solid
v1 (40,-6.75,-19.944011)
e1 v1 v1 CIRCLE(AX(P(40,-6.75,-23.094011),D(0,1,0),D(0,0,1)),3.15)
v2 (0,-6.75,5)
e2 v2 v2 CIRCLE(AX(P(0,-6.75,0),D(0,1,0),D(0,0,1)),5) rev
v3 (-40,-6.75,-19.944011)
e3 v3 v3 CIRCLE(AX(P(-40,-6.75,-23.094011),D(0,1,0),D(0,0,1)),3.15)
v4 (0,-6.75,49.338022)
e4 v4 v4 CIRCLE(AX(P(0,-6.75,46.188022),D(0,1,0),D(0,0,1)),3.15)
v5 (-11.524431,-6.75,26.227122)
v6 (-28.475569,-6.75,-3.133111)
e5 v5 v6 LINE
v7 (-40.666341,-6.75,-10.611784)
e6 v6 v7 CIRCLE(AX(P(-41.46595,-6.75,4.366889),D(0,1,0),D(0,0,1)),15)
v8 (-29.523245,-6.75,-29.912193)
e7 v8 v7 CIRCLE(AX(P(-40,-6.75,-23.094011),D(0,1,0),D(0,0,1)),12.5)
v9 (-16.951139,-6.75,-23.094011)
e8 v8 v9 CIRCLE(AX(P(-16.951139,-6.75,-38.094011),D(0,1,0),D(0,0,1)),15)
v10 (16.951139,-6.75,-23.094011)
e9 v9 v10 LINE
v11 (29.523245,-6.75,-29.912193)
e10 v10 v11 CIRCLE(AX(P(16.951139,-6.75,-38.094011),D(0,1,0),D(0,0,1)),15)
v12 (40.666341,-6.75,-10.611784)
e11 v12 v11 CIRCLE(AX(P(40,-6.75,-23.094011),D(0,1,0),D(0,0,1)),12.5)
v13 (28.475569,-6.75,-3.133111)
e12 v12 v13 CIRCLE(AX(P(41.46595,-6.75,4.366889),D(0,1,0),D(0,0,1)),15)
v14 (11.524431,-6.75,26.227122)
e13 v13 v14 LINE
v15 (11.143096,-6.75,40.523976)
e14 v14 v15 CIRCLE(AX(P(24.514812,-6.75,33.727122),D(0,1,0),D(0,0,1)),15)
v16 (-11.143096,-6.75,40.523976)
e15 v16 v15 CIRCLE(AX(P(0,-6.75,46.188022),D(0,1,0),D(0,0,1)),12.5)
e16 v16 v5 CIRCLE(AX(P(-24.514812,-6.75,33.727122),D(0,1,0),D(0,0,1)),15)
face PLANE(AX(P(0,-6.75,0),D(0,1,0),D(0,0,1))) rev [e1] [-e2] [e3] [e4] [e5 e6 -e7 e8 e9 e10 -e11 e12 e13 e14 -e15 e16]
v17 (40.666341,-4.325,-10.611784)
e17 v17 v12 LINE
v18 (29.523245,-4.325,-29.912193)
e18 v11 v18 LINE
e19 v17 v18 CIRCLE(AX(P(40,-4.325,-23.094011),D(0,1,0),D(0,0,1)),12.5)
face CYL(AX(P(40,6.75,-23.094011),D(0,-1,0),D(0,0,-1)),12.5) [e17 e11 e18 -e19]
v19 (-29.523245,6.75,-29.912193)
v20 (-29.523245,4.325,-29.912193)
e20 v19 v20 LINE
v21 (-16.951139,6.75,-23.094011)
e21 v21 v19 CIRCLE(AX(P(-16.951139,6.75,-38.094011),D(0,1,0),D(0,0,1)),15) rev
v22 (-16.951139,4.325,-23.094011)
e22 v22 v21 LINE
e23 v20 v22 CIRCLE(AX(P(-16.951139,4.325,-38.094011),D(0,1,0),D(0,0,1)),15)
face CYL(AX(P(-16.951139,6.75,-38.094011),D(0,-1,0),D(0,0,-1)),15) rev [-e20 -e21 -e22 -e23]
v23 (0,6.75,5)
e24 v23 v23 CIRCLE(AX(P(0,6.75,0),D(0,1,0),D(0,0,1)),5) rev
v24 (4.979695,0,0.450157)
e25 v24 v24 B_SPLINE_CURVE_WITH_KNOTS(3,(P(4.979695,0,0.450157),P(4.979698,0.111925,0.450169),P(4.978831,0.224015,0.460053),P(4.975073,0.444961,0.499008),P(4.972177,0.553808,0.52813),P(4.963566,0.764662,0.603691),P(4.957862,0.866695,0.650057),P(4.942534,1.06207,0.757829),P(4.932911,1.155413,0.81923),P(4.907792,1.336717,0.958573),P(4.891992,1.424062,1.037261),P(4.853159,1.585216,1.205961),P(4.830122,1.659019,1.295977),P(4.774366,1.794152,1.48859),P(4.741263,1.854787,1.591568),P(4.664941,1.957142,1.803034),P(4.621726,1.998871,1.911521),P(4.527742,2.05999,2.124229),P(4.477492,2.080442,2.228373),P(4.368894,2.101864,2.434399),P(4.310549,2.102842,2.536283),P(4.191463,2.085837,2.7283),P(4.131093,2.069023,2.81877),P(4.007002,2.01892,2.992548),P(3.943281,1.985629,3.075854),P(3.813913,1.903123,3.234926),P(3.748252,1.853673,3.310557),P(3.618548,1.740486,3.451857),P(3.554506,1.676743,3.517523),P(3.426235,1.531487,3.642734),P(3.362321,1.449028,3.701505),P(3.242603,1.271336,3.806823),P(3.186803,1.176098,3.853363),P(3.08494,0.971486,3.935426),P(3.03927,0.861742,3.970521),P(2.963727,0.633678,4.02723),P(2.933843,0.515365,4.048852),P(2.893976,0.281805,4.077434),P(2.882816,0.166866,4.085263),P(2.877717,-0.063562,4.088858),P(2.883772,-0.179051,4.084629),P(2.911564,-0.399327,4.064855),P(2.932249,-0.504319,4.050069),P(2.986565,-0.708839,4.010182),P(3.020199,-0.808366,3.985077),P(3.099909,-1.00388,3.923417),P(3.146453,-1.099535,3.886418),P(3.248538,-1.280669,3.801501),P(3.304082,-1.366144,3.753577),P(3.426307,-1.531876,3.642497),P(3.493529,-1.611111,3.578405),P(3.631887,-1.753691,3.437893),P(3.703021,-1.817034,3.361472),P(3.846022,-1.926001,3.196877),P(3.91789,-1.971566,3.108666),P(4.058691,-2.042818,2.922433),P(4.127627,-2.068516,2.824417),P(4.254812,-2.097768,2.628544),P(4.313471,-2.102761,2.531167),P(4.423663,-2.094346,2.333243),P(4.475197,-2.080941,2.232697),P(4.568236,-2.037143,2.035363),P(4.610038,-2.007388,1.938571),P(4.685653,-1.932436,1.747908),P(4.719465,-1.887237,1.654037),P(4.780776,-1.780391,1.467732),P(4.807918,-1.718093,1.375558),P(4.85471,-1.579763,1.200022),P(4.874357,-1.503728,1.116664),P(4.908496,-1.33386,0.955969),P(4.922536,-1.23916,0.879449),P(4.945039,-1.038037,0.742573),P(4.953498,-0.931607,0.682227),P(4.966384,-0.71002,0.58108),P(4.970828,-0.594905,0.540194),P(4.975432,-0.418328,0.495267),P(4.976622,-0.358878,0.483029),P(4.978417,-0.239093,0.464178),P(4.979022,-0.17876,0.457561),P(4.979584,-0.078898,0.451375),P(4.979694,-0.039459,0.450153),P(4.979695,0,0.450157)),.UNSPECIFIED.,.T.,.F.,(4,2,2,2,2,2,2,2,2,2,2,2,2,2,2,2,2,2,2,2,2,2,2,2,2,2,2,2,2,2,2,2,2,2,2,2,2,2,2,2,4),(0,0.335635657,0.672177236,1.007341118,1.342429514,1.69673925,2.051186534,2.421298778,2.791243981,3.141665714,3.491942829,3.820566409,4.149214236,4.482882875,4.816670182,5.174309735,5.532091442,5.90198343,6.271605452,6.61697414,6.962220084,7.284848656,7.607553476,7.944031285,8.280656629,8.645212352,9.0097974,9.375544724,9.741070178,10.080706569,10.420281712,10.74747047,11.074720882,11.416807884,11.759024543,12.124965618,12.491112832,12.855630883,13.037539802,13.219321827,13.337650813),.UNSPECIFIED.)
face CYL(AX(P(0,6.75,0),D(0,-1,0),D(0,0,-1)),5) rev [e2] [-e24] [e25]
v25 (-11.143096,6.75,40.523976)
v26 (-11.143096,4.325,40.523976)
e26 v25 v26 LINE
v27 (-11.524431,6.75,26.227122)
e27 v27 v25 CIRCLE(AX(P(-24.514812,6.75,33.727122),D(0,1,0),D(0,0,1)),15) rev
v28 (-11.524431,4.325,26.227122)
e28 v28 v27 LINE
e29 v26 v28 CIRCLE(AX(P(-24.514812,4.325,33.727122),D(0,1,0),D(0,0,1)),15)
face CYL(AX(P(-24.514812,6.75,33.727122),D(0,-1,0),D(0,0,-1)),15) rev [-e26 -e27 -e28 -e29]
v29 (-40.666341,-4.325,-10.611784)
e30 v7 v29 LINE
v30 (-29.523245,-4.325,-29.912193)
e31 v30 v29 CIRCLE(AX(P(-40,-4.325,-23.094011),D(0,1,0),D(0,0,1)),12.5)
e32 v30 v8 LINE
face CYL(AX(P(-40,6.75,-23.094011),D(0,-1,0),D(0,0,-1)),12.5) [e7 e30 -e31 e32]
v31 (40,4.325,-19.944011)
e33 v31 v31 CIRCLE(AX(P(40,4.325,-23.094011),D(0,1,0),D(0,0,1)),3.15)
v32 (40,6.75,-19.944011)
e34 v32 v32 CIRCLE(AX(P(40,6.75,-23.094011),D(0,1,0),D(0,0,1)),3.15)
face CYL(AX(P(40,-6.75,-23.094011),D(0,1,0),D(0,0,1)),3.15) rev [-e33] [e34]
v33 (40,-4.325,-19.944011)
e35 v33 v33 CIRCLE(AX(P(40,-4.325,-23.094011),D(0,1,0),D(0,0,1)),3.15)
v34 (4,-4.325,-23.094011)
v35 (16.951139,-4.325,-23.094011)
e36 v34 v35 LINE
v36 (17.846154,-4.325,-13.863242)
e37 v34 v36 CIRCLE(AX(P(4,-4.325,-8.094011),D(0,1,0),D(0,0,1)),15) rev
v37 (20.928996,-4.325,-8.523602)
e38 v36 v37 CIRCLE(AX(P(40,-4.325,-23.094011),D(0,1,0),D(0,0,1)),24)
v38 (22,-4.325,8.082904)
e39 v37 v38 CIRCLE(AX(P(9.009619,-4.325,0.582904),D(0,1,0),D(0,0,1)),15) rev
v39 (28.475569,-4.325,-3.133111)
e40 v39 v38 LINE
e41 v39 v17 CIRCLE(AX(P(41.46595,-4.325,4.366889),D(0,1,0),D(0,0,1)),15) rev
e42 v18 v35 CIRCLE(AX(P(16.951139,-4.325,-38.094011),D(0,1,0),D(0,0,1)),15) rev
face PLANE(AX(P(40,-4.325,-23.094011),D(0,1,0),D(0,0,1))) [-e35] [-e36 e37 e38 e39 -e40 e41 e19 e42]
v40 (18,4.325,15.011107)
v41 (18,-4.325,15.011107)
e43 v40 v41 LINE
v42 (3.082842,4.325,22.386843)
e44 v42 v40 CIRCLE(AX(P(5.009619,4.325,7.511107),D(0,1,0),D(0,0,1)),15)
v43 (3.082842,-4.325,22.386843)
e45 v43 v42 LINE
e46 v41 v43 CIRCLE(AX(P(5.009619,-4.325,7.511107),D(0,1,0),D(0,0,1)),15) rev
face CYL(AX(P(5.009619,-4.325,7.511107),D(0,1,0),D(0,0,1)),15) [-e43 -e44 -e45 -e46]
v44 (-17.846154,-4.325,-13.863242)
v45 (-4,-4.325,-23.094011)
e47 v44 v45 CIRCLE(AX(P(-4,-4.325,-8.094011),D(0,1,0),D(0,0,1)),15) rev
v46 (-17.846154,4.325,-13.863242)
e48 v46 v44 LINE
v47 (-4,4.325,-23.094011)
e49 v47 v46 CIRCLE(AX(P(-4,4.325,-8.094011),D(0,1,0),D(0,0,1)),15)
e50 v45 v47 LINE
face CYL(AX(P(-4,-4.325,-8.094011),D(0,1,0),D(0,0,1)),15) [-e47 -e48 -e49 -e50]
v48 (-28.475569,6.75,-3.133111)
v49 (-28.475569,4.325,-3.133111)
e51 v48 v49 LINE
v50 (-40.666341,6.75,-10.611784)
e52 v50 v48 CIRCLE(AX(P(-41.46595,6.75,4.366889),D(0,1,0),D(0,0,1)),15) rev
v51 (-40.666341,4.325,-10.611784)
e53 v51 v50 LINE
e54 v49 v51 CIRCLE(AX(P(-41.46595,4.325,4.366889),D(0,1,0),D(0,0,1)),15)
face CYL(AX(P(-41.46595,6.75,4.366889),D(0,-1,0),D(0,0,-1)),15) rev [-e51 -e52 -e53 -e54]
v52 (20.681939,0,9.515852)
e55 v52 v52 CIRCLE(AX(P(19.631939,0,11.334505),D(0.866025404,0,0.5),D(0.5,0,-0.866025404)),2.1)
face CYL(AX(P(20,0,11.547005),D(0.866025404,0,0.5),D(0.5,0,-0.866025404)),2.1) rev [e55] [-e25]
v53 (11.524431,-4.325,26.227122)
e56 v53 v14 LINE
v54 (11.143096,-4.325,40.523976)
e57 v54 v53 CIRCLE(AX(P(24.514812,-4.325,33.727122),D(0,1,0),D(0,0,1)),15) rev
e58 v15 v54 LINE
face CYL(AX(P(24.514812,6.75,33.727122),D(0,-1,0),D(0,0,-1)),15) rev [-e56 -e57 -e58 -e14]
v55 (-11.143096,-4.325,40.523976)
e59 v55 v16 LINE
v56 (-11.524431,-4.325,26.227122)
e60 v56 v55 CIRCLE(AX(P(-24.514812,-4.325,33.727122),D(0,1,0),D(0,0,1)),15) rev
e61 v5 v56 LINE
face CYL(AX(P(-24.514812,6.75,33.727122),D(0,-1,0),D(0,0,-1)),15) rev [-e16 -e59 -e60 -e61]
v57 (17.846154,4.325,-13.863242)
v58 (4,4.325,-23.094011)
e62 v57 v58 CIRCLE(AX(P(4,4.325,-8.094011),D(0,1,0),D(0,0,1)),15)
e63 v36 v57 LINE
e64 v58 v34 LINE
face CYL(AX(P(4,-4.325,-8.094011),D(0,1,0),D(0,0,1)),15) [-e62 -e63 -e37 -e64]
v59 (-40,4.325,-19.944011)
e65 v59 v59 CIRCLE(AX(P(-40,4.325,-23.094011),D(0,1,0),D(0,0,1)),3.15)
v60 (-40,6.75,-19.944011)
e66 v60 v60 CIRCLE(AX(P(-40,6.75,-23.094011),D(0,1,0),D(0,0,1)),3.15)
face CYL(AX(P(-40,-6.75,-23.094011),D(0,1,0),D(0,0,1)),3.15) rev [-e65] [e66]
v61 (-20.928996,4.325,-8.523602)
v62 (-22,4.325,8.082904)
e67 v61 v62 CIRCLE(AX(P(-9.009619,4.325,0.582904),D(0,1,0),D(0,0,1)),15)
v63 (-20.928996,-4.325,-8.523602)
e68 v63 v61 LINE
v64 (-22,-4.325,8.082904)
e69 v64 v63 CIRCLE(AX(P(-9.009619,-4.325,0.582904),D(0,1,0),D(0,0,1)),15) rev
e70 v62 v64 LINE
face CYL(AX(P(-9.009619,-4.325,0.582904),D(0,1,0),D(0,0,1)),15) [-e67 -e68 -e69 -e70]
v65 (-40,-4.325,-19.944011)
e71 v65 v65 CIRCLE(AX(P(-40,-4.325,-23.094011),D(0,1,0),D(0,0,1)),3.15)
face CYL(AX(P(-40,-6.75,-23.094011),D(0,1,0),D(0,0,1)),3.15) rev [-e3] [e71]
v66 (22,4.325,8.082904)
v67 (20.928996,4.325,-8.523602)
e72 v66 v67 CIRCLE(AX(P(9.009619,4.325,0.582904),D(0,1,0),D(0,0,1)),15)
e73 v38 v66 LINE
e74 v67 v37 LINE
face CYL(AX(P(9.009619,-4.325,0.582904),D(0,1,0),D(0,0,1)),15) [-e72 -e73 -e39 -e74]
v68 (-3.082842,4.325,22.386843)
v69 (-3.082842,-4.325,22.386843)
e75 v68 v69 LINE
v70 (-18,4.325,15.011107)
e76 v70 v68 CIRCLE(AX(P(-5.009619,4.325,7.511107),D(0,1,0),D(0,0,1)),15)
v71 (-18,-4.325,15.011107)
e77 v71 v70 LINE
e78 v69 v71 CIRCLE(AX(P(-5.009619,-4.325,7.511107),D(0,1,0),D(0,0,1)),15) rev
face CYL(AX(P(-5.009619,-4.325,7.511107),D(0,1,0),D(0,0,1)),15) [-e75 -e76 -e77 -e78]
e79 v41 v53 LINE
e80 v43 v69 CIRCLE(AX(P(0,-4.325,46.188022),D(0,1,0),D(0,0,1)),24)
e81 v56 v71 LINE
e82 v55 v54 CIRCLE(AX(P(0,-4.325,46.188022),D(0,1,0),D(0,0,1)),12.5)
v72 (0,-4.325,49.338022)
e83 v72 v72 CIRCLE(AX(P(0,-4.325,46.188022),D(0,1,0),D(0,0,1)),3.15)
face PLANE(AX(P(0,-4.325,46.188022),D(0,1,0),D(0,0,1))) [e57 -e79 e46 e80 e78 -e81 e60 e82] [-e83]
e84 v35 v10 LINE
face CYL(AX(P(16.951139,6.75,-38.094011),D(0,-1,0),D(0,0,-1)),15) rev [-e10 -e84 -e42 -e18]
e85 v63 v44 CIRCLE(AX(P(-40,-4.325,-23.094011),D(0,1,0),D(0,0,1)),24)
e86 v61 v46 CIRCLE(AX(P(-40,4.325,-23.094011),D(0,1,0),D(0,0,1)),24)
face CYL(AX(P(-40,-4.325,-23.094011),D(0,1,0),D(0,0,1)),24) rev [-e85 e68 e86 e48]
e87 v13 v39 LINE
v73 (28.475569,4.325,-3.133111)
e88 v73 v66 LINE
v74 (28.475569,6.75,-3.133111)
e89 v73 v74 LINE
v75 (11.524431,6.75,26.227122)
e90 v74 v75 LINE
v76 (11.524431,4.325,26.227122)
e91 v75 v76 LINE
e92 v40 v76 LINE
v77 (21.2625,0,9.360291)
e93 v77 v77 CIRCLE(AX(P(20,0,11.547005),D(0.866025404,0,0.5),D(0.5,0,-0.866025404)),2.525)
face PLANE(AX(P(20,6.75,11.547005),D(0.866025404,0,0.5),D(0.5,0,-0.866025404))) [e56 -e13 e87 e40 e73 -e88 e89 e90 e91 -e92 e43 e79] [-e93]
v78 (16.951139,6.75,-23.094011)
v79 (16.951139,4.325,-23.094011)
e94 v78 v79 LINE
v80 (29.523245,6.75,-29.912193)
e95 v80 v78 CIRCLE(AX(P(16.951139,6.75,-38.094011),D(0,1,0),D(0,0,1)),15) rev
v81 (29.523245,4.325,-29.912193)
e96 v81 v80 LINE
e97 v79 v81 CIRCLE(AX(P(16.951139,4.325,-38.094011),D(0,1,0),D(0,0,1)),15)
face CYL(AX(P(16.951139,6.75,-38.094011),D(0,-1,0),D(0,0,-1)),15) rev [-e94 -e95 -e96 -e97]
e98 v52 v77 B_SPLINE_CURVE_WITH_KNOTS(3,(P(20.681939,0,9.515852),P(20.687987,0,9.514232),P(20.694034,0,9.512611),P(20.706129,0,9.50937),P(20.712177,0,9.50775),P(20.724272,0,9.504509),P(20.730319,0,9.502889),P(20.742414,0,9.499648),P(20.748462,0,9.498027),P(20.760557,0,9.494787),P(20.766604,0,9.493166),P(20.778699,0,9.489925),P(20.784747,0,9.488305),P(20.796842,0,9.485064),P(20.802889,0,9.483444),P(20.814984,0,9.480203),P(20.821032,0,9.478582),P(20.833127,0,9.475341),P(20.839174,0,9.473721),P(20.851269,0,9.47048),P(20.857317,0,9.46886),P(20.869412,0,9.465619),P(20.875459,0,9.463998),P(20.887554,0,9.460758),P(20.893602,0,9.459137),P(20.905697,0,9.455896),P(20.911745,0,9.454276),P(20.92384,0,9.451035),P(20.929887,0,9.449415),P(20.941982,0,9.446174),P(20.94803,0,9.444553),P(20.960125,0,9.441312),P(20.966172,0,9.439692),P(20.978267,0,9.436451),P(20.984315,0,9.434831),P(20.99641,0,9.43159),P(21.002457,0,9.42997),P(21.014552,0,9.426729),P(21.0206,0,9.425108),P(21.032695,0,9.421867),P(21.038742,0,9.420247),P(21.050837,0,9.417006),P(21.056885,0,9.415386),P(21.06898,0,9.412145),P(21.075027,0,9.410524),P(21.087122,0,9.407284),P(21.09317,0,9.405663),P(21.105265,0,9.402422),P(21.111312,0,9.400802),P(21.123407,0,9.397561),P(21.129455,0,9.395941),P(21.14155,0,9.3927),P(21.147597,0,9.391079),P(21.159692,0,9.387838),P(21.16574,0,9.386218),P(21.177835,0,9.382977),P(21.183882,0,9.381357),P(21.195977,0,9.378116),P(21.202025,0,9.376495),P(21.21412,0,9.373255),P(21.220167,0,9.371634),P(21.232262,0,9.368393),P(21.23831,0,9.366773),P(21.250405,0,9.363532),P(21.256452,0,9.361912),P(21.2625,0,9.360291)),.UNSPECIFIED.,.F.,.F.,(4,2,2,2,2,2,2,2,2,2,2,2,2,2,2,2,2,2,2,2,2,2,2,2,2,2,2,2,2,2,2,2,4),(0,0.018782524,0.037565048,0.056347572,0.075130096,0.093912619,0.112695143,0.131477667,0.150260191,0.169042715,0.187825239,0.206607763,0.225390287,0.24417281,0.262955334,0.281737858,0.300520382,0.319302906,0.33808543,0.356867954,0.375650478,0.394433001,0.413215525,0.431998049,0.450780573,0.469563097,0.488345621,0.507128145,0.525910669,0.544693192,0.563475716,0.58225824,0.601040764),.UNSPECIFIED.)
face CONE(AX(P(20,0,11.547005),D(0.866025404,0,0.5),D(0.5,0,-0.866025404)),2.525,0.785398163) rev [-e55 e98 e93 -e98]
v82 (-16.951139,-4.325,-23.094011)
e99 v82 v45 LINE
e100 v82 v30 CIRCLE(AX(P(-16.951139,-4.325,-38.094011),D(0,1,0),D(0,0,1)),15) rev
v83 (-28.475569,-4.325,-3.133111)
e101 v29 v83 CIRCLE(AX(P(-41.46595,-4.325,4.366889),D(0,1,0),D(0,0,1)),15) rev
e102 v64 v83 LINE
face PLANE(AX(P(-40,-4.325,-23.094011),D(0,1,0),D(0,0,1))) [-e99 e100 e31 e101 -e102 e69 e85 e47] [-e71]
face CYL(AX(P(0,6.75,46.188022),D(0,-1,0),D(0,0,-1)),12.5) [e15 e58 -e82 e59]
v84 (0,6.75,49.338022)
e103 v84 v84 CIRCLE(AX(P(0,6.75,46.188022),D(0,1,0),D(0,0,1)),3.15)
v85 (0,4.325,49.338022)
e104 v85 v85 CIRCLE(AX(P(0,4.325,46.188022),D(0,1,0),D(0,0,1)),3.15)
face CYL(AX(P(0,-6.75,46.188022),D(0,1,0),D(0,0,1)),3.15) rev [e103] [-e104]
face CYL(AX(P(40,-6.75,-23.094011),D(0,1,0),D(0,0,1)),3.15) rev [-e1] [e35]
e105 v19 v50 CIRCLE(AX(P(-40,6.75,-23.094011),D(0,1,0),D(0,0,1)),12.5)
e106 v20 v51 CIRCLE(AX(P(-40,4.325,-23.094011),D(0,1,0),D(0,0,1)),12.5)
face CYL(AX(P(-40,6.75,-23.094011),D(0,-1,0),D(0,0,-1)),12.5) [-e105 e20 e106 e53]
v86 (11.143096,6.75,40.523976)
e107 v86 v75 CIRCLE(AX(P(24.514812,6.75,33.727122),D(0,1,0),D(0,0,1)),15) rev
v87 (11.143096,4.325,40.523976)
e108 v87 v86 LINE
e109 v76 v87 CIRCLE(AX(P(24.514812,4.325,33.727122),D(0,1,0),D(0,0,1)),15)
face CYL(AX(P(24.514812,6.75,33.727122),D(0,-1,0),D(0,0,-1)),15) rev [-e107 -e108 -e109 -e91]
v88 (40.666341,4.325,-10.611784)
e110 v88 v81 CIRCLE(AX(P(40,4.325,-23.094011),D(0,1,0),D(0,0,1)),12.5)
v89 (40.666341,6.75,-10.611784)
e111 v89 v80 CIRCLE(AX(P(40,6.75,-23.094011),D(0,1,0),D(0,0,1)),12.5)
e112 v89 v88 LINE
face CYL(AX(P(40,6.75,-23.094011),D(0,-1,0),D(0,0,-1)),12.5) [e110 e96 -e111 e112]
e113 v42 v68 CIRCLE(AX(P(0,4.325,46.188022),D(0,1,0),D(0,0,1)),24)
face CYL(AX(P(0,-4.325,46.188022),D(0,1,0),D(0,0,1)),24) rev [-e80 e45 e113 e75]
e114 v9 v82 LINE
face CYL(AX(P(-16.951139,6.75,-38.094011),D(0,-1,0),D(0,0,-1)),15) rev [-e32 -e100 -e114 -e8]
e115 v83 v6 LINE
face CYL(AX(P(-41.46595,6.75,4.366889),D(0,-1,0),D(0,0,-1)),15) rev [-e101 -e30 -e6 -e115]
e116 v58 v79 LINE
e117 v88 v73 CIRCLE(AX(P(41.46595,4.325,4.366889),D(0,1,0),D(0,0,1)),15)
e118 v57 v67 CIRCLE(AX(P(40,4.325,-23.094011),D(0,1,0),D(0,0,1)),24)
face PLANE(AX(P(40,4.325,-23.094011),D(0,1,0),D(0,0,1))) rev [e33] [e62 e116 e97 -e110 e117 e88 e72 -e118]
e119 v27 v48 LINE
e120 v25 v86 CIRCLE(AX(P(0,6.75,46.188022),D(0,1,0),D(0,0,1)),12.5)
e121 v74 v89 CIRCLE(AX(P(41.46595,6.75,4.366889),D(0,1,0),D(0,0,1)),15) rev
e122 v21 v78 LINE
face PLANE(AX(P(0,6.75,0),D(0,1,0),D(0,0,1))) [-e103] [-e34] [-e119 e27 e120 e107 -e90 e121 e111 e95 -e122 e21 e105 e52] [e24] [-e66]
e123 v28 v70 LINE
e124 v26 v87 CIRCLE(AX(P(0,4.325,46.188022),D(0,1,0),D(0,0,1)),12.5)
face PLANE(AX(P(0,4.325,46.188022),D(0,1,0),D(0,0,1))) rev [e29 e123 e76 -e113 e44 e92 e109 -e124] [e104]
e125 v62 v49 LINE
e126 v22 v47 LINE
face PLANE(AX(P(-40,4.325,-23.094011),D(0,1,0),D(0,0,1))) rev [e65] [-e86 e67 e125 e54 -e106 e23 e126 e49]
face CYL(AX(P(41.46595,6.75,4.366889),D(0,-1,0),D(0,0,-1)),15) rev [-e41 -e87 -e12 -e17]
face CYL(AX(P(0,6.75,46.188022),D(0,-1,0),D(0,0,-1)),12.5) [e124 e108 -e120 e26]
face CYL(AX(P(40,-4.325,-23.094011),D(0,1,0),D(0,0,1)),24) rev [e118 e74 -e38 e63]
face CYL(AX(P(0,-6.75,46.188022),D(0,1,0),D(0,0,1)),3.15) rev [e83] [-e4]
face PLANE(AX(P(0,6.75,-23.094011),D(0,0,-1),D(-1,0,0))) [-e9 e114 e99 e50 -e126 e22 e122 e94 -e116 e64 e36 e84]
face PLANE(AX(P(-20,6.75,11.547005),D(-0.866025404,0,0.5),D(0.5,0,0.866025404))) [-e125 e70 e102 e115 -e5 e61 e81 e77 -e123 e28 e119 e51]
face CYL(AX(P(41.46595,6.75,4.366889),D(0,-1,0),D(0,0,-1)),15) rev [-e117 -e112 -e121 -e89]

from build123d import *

# Parameters (mm, degrees)
ESQUISSE1_R             = 12.5
ESQUISSE1_R_2           = 5
BOSS_EXTRU_1_DEPTH      = 6.75
ESQUISSE7_R             = 24
ENL_V_MAT_EXTRU_1_DEPTH = 4.325
CONG_6_START            = -4.325
CONG_6_DEPTH            = 8.65
CONG_7_R                = 15
ESQUISSE25_R            = 3.15
ENL_V_MAT_EXTRU_2_DEPTH = 80.892326756


with BuildPart() as part:
    # Esquisse1 → Boss.-Extru.1 (new, symmetric)
    # profile 1 of 16: a face of its own
    with BuildSketch(Plane(origin=(0, 0, 0), x_dir=(1, 0, 0), z_dir=(0, 1, 0))):
        with Locations((-40, 23.094010768)):
            Circle(ESQUISSE1_R)
    # profile 2 of 16: a face of its own
    with BuildSketch(Plane(origin=(0, 0, 0), x_dir=(1, 0, 0), z_dir=(0, 1, 0))):
        with Locations((0, -46.188021535)):
            Circle(ESQUISSE1_R)
    # profile 3 of 16: a face of its own
    with BuildSketch(Plane(origin=(0, 0, 0), x_dir=(1, 0, 0), z_dir=(0, 1, 0))):
        with Locations((40, 23.094010768)):
            Circle(ESQUISSE1_R)
    # profile 4 of 16: a face of its own
    with BuildSketch(Plane(origin=(0, 0, 0), x_dir=(1, 0, 0), z_dir=(0, 1, 0))):
        Polygon((0, -46.188021535), (-40, 23.094010768), (40, 23.094010768), align=None)
        with Locations(Location((0, 0, 0), (0, 0, 270))):
            Circle(ESQUISSE1_R_2, mode=Mode.SUBTRACT)
    # profile 5 of 16: a face of its own
    with BuildSketch(Plane(origin=(0, 0, 0), x_dir=(1, 0, 0), z_dir=(0, 1, 0))):
        with BuildLine():
            ThreePointArc((-33.75, 12.26869322), (-29.174682453, 16.844010768), (-27.5, 23.094010768))
            Line((-27.5, 23.094010768), (-40, 23.094010768))
            Line((-40, 23.094010768), (-33.75, 12.26869322))
        make_face()
    # profile 6 of 16: a face of its own
    with BuildSketch(Plane(origin=(0, 0, 0), x_dir=(1, 0, 0), z_dir=(0, 1, 0))):
        with BuildLine():
            Line((-40, 23.094010768), (-27.5, 23.094010768))
            ThreePointArc((-27.5, 23.094010768), (-50.825317547, 29.344010768), (-33.75, 12.26869322))
            Line((-33.75, 12.26869322), (-40, 23.094010768))
        make_face()
    # profile 7 of 16: a face of its own
    with BuildSketch(Plane(origin=(0, 0, 0), x_dir=(1, 0, 0), z_dir=(0, 1, 0))):
        with BuildLine():
            Line((27.5, 23.094010768), (40, 23.094010768))
            Line((40, 23.094010768), (33.75, 12.26869322))
            ThreePointArc((33.75, 12.26869322), (46.25, 12.26869322), (52.5, 23.094010768))
            ThreePointArc((52.5, 23.094010768), (40, 35.594010768), (27.5, 23.094010768))
        make_face()
    # profile 8 of 16: a face of its own
    with BuildSketch(Plane(origin=(0, 0, 0), x_dir=(1, 0, 0), z_dir=(0, 1, 0))):
        with BuildLine():
            Line((33.75, 12.26869322), (40, 23.094010768))
            Line((40, 23.094010768), (27.5, 23.094010768))
            ThreePointArc((27.5, 23.094010768), (29.174682453, 16.844010768), (33.75, 12.26869322))
        make_face()
    # profile 9 of 16: a face of its own
    with BuildSketch(Plane(origin=(0, 0, 0), x_dir=(1, 0, 0), z_dir=(0, 1, 0))):
        with BuildLine():
            Line((27.5, 23.094010768), (40, 23.094010768))
            Line((40, 23.094010768), (33.75, 12.26869322))
            ThreePointArc((33.75, 12.26869322), (46.25, 12.26869322), (52.5, 23.094010768))
            ThreePointArc((52.5, 23.094010768), (40, 35.594010768), (27.5, 23.094010768))
        make_face()
    # profile 10 of 16: a face of its own
    with BuildSketch(Plane(origin=(0, 0, 0), x_dir=(1, 0, 0), z_dir=(0, 1, 0))):
        with BuildLine():
            Line((33.75, 12.26869322), (40, 23.094010768))
            Line((40, 23.094010768), (27.5, 23.094010768))
            ThreePointArc((27.5, 23.094010768), (29.174682453, 16.844010768), (33.75, 12.26869322))
        make_face()
    # profile 11 of 16: a face of its own
    with BuildSketch(Plane(origin=(0, 0, 0), x_dir=(1, 0, 0), z_dir=(0, 1, 0))):
        with BuildLine():
            ThreePointArc((-33.75, 12.26869322), (-29.174682453, 16.844010768), (-27.5, 23.094010768))
            Line((-27.5, 23.094010768), (-40, 23.094010768))
            Line((-40, 23.094010768), (-33.75, 12.26869322))
        make_face()
    # profile 12 of 16: a face of its own
    with BuildSketch(Plane(origin=(0, 0, 0), x_dir=(1, 0, 0), z_dir=(0, 1, 0))):
        with BuildLine():
            Line((-40, 23.094010768), (-27.5, 23.094010768))
            ThreePointArc((-27.5, 23.094010768), (-50.825317547, 29.344010768), (-33.75, 12.26869322))
            Line((-33.75, 12.26869322), (-40, 23.094010768))
        make_face()
    # profile 13 of 16: a face of its own
    with BuildSketch(Plane(origin=(0, 0, 0), x_dir=(1, 0, 0), z_dir=(0, 1, 0))):
        with BuildLine():
            ThreePointArc((12.5, -46.188021535), (10.825317547, -39.938021535), (6.25, -35.362703988))
            Line((6.25, -35.362703988), (0, -46.188021535))
            Line((0, -46.188021535), (-6.25, -35.362703988))
            ThreePointArc((-6.25, -35.362703988), (-6.25, -57.013339082), (12.5, -46.188021535))
        make_face()
    # profile 14 of 16: a face of its own
    with BuildSketch(Plane(origin=(0, 0, 0), x_dir=(1, 0, 0), z_dir=(0, 1, 0))):
        with BuildLine():
            Line((0, -46.188021535), (6.25, -35.362703988))
            ThreePointArc((6.25, -35.362703988), (0, -33.688021535), (-6.25, -35.362703988))
            Line((-6.25, -35.362703988), (0, -46.188021535))
        make_face()
    # profile 15 of 16: a face of its own
    with BuildSketch(Plane(origin=(0, 0, 0), x_dir=(1, 0, 0), z_dir=(0, 1, 0))):
        with BuildLine():
            ThreePointArc((12.5, -46.188021535), (10.825317547, -39.938021535), (6.25, -35.362703988))
            Line((6.25, -35.362703988), (0, -46.188021535))
            Line((0, -46.188021535), (-6.25, -35.362703988))
            ThreePointArc((-6.25, -35.362703988), (-6.25, -57.013339082), (12.5, -46.188021535))
        make_face()
    # profile 16 of 16: a face of its own
    with BuildSketch(Plane(origin=(0, 0, 0), x_dir=(1, 0, 0), z_dir=(0, 1, 0))):
        with BuildLine():
            Line((0, -46.188021535), (6.25, -35.362703988))
            ThreePointArc((6.25, -35.362703988), (0, -33.688021535), (-6.25, -35.362703988))
            Line((-6.25, -35.362703988), (0, -46.188021535))
        make_face()
    extrude(amount=BOSS_EXTRU_1_DEPTH, both=True)

    # Esquisse7 → Enlèv. mat.-Extru.1 (cut, symmetric)
    with BuildSketch(Plane(origin=(0, 0, 0), x_dir=(1, 0, 0), z_dir=(0, 1, 0))):
        with Locations((-40, 23.094010768)):
            Circle(ESQUISSE7_R)
        with Locations((0, -46.188021535)):
            Circle(ESQUISSE7_R)
        with Locations((40, 23.094010768)):
            Circle(ESQUISSE7_R)
    extrude(amount=ENL_V_MAT_EXTRU_1_DEPTH, both=True, mode=Mode.SUBTRACT)

    # Congé6: read off the stored shape, not the designer's step
    # Congé6 outline → Congé6 (cut)
    with BuildSketch(Plane(origin=(0, 0, 0), x_dir=(1, 0, 0), z_dir=(0, 1, 0)).offset(CONG_6_START)):
        with BuildLine():
            ThreePointArc((4, 23.094010768), (12.320502943, 20.574765183), (17.846153846, 13.863241537))
            ThreePointArc((17.846153846, 13.863241537), (16.466063783, 18.387223525), (16, 23.094010768))
            Line((16, 23.094010768), (4, 23.094010768))
        make_face()
        with BuildLine():
            ThreePointArc((28, 2.309401077), (24.156834569, 5.066417775), (20.928996273, 8.523601822))
            ThreePointArc((20.928996273, 8.523601822), (23.978520797, 0.382485945), (22, -8.082903769))
            Line((22, -8.082903769), (28, 2.309401077))
        make_face()
        with BuildLine():
            ThreePointArc((-17.846153846, 13.863241537), (-12.320502943, 20.574765183), (-4, 23.094010768))
            Line((-4, 23.094010768), (-16, 23.094010768))
            ThreePointArc((-16, 23.094010768), (-16.466063783, 18.387223525), (-17.846153846, 13.863241537))
        make_face()
        with BuildLine():
            Line((12, -25.403411844), (18, -15.011106999))
            ThreePointArc((18, -15.011106999), (11.658017854, -20.957251128), (3.082842427, -22.386843359))
            ThreePointArc((3.082842427, -22.386843359), (7.690770786, -23.453641299), (12, -25.403411844))
        make_face()
        with BuildLine():
            ThreePointArc((-22, -8.082903769), (-23.978520797, 0.382485945), (-20.928996273, 8.523601822))
            ThreePointArc((-20.928996273, 8.523601822), (-24.156834569, 5.066417775), (-28, 2.309401077))
            Line((-28, 2.309401077), (-22, -8.082903769))
        make_face()
        with BuildLine():
            ThreePointArc((-12, -25.403411844), (-7.690770786, -23.453641299), (-3.082842427, -22.386843359))
            ThreePointArc((-3.082842427, -22.386843359), (-11.658017854, -20.957251128), (-18, -15.011106999))
            Line((-18, -15.011106999), (-12, -25.403411844))
        make_face()
    extrude(amount=CONG_6_DEPTH, mode=Mode.SUBTRACT)

    # Trou taraudé M51: read off the stored shape, not the designer's step
    # Trou taraudé M51 outline → Trou taraudé M51 (revolve, cut)
    with BuildSketch(Plane(origin=(0, 0, 0), x_dir=(0.5000000000000003, 0, -0.8660254037844385), z_dir=(0, -1, 0))):
        Polygon((0, 4.537411543), (2.1, 4.537411543), (2.1, 22.669010768), (2.525, 23.094010768), (0, 23.094010768), align=None)
    revolve(axis=Axis((0, 0, 0), (0.8660254037844385, 0, 0.5000000000000003)), mode=Mode.SUBTRACT)

    # Congé7
    cong_7_edges = [part.edges().sort_by_distance(p)[0] for p in [
        (-27.5, 5.5375, -23.094010768),
        (27.5, 5.5375, -23.094010768),
        (33.75, 5.5375, -12.26869322),
        (6.25, 5.5375, 35.362703988),
        (-6.25, 5.5375, 35.362703988),
        (-33.75, 5.5375, -12.26869322),
        (-27.5, -5.5375, -23.094010768),
        (27.5, -5.5375, -23.094010768),
        (33.75, -5.5375, -12.26869322),
        (6.25, -5.5375, 35.362703988),
        (-6.25, -5.5375, 35.362703988),
        (-33.75, -5.5375, -12.26869322),
    ]]
    fillet(cong_7_edges, radius=CONG_7_R)

    # Esquisse25 → Enlèv. mat.-Extru.2 (cut, through all)
    with BuildSketch(Plane(origin=(0, 6.75, 0), x_dir=(1, 0, 0), z_dir=(0, 1, 0))):
        with Locations(Location((-40, 23.094010768, 0), (0, 0, 270))):
            Circle(ESQUISSE25_R)
        with Locations(Location((40, 23.094010768, 0), (0, 0, 270))):
            Circle(ESQUISSE25_R)
        with Locations(Location((0, -46.188021535, 0), (0, 0, 270))):
            Circle(ESQUISSE25_R)
    extrude(amount=-ENL_V_MAT_EXTRU_2_DEPTH, mode=Mode.SUBTRACT)


solid = part.part
